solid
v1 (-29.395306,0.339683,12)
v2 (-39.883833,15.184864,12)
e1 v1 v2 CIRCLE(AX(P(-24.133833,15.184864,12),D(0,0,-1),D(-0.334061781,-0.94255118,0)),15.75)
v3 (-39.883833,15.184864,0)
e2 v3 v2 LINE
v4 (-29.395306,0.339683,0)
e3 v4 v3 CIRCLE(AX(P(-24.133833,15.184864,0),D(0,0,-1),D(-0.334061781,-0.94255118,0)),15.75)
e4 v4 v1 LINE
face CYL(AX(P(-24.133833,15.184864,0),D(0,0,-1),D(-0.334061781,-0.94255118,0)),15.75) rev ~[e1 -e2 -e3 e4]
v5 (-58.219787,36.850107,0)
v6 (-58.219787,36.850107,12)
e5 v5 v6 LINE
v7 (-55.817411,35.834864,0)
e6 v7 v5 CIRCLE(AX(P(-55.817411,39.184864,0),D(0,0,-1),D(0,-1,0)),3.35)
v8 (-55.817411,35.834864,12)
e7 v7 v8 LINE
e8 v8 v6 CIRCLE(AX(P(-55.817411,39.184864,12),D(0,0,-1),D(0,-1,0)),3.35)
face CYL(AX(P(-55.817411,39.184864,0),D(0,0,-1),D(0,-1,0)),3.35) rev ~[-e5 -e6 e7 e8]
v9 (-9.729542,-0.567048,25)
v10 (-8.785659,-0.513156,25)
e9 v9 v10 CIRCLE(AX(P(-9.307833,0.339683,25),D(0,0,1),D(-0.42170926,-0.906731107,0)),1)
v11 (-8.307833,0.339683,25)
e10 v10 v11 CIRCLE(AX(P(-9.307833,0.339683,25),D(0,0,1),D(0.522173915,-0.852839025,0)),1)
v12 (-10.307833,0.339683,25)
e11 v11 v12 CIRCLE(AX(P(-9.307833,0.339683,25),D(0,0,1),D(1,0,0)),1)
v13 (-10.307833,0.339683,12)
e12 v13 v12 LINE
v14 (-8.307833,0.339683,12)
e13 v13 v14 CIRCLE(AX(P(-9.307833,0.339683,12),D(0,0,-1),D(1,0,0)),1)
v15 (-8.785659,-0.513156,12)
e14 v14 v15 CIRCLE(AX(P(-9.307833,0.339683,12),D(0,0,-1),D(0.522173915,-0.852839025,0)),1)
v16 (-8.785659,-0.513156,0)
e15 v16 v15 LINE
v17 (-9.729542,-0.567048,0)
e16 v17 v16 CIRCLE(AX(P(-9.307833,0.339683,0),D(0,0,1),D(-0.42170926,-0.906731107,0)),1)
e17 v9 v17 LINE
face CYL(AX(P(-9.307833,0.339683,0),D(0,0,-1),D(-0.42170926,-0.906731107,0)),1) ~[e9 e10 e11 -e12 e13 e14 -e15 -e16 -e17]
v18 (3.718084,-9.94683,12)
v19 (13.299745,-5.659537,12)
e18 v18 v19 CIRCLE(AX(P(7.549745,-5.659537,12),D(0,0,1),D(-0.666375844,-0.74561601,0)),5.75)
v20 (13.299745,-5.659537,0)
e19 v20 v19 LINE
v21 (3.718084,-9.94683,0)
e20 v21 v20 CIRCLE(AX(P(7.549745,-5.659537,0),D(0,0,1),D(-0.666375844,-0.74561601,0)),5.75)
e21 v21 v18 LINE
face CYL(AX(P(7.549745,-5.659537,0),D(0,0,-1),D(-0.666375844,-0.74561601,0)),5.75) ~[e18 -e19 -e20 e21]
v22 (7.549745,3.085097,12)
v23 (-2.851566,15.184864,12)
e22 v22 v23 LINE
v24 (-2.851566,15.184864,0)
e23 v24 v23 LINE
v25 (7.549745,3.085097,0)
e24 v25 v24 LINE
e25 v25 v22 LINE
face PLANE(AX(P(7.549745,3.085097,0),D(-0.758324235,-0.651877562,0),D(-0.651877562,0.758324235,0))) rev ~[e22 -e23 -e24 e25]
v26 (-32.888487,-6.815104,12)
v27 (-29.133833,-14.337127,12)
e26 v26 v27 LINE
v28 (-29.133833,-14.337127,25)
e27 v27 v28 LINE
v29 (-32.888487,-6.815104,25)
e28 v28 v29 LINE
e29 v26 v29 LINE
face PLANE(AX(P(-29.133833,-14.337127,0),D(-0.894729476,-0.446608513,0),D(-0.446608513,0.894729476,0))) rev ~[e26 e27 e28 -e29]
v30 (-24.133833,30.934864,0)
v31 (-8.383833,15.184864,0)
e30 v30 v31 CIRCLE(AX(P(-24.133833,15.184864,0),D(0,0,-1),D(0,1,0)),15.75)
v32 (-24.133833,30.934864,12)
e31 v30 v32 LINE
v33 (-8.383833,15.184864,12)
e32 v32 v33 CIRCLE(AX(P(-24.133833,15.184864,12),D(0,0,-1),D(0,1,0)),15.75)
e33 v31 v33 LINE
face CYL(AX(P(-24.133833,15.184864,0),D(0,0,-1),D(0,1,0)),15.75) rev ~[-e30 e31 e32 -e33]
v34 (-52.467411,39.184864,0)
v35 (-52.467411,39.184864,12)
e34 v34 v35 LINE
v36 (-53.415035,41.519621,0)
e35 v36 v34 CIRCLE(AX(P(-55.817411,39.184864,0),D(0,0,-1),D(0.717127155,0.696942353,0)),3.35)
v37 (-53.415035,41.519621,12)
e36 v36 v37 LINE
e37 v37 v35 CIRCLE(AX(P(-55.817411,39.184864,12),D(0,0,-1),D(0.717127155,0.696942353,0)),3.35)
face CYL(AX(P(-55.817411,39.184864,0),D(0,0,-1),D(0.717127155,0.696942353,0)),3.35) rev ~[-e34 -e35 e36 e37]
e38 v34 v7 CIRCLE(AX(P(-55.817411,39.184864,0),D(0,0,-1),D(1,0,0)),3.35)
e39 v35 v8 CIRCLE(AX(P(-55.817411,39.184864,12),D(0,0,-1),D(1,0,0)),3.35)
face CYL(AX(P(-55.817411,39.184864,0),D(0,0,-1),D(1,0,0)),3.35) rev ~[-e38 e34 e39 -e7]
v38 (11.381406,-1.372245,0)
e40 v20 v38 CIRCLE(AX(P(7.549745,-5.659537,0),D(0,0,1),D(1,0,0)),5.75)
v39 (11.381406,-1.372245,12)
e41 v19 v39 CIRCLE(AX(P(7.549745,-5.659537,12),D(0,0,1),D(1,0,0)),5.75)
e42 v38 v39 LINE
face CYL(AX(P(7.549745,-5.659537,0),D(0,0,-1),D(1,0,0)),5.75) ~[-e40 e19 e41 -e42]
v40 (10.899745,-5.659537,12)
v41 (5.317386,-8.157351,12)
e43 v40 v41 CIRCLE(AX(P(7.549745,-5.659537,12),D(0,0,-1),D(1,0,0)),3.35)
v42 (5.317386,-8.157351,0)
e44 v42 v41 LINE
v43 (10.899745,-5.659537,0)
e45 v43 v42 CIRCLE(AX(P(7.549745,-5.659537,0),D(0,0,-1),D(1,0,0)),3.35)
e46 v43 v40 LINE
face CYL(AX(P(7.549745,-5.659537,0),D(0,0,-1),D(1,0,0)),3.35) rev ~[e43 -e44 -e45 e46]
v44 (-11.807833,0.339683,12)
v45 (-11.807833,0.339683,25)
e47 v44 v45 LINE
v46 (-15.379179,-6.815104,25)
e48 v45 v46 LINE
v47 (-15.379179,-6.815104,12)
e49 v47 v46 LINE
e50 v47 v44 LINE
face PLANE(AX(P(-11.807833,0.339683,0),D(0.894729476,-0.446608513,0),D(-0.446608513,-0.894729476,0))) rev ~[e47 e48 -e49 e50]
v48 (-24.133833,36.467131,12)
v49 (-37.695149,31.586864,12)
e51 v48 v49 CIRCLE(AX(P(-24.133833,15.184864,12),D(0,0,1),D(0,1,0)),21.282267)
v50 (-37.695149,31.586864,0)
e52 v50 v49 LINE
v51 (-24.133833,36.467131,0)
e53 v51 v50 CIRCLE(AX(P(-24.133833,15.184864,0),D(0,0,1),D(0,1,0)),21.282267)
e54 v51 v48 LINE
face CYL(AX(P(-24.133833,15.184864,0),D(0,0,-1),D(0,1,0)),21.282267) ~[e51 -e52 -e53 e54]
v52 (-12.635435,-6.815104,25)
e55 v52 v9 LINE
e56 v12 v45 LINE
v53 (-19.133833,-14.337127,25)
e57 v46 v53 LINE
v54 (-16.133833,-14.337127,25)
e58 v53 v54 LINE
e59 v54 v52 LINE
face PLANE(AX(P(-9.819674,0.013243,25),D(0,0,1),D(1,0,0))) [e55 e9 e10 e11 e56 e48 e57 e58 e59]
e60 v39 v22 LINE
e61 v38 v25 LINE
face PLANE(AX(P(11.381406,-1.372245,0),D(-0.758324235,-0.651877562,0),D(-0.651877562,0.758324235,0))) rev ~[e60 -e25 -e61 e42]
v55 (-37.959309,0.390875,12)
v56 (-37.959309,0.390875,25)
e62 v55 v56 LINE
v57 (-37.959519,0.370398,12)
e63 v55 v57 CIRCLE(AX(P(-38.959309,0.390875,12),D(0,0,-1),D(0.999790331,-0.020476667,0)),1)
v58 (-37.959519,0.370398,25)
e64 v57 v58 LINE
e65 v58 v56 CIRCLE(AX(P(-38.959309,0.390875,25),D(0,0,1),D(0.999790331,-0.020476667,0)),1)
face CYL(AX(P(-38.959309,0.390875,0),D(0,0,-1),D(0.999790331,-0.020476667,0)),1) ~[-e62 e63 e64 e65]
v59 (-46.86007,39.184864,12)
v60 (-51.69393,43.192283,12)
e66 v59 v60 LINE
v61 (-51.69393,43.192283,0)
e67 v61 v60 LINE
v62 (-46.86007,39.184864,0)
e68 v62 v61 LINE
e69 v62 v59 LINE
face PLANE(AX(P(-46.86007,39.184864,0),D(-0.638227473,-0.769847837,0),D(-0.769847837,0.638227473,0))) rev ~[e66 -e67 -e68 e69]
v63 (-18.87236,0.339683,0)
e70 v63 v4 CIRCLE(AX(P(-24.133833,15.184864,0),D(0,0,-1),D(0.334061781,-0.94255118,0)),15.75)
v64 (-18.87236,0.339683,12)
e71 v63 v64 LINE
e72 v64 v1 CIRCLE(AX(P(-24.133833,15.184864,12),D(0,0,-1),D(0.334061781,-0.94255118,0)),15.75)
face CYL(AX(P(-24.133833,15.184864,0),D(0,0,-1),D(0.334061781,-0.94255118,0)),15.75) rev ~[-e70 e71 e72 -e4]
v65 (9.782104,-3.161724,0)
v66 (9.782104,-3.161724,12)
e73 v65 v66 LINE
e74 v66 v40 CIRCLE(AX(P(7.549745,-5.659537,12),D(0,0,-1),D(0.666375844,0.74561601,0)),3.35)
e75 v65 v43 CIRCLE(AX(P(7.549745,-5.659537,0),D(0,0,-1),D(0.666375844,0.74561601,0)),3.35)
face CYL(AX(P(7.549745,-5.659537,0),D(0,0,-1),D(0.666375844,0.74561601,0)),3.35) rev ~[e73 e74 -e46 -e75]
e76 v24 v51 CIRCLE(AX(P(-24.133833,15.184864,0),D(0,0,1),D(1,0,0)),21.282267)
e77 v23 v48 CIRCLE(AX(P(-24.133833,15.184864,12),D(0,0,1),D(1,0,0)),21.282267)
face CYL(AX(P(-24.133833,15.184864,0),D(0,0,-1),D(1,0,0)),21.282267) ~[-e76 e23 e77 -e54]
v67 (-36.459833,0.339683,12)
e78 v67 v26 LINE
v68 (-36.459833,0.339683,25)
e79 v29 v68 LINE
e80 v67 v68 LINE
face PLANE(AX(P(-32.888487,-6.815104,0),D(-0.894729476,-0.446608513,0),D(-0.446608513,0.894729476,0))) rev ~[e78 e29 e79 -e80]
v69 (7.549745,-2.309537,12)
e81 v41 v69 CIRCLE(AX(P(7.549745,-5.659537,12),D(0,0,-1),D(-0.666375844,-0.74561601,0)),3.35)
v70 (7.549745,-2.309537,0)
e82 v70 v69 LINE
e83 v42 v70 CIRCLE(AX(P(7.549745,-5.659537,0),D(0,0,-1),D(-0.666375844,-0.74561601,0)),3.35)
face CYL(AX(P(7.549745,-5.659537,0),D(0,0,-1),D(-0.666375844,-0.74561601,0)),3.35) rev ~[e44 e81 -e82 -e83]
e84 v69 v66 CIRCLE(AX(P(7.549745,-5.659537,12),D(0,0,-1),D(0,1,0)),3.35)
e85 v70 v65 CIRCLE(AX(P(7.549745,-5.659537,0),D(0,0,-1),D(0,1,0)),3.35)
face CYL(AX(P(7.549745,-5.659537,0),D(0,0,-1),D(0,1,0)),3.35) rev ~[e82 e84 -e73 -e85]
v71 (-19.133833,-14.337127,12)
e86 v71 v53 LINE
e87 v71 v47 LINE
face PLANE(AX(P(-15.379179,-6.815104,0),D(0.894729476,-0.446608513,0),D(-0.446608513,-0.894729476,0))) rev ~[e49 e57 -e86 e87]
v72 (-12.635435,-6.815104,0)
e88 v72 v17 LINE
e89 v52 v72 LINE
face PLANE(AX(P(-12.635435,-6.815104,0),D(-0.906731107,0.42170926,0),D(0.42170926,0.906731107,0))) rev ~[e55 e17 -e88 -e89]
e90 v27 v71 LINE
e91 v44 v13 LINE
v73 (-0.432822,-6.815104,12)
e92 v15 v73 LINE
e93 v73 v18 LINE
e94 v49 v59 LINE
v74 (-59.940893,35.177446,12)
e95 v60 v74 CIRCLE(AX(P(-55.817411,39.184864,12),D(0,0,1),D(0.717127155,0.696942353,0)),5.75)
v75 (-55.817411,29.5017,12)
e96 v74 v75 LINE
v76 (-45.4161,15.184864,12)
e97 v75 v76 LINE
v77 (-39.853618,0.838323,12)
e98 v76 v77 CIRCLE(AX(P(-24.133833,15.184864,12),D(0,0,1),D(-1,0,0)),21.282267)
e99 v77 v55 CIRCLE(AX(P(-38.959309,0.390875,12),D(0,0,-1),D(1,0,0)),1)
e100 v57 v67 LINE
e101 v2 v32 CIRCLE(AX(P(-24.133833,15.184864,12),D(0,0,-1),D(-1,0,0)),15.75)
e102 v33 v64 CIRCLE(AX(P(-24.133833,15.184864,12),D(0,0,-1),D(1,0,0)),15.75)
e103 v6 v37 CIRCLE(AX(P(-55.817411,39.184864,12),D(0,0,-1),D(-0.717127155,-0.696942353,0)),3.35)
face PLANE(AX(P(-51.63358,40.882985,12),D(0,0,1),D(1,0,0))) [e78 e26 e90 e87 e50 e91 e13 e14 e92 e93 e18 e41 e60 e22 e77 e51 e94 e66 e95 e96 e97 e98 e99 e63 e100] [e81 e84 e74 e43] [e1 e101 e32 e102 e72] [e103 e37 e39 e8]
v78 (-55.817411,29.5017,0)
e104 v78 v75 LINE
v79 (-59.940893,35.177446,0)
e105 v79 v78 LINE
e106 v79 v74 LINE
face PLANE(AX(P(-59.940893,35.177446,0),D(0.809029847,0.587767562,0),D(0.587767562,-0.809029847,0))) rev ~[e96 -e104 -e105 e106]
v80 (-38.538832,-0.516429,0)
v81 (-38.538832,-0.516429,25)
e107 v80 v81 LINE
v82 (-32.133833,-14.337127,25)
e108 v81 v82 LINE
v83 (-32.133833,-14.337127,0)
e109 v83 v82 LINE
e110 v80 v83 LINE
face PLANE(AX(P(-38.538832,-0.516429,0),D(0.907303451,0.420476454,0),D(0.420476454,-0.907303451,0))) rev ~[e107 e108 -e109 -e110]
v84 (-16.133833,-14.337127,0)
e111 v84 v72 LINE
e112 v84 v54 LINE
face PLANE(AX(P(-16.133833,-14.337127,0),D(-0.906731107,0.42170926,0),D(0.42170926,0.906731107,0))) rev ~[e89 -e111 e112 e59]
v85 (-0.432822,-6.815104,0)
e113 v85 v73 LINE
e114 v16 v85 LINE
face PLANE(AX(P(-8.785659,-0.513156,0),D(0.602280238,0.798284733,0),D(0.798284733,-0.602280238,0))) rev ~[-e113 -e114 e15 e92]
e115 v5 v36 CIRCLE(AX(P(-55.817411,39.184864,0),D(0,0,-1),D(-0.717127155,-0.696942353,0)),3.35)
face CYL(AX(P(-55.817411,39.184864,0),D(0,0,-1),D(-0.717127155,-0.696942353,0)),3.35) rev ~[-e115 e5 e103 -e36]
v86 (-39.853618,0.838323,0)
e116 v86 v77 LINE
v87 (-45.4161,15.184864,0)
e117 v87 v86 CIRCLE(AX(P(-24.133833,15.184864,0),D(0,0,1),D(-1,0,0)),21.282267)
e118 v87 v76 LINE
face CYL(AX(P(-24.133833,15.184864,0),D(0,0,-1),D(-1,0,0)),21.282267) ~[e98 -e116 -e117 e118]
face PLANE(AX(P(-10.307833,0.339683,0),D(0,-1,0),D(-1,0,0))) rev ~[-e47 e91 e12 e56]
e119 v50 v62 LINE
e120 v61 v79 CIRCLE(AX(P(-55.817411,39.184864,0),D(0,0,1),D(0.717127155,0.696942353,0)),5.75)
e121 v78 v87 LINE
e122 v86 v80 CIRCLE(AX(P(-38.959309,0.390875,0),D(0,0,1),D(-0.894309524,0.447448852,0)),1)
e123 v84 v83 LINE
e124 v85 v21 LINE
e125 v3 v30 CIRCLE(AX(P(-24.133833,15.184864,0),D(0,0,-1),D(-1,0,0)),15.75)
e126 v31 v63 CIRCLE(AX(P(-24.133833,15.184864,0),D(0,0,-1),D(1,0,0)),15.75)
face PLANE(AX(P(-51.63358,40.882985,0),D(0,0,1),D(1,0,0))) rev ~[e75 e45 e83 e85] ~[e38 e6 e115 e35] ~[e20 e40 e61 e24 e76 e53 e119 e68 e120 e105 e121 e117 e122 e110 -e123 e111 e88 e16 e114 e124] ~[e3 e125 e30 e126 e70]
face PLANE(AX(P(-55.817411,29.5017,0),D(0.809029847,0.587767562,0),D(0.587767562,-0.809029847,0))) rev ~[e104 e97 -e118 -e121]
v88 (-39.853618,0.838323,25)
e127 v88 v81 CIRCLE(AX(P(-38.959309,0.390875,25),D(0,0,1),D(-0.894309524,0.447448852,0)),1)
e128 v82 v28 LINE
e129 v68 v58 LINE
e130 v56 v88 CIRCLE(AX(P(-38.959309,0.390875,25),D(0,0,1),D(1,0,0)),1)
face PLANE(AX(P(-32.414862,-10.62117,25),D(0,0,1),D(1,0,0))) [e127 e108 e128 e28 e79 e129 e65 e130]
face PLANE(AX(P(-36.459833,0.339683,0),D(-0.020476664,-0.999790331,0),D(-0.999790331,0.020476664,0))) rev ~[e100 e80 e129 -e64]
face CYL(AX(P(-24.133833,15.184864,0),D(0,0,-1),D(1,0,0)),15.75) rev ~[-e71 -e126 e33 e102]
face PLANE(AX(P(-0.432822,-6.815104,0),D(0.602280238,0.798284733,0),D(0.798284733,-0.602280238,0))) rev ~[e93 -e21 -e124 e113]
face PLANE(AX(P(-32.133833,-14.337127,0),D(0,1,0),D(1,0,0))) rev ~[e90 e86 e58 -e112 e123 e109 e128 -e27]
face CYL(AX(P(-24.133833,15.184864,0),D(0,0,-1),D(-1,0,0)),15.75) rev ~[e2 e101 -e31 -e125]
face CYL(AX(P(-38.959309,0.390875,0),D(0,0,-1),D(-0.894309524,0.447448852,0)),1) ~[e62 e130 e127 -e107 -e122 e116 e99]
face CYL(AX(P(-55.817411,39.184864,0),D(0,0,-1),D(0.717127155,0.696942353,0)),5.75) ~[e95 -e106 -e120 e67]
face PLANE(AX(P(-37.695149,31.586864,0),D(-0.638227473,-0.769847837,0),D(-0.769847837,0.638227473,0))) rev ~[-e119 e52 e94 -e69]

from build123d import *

# Parameters (mm, degrees)
F1_DEPTH = 12
F2_DEPTH = 25


with BuildPart() as f1:
    # F0 (on Top) → F1 (new body)
    with BuildSketch(Plane.XY):
        with BuildLine():
            ThreePointArc((-53.4150354704, 41.5196209399), (-52.7133447938, 40.4447331982), (-52.4674114412, 39.1848640586))
            Line((-52.4674114412, 39.1848640586), (-50.0674114412, 39.1848640586))
            ThreePointArc((-50.0674114412, 39.1848640586), (-50.4895358525, 41.3473260146), (-51.6939302973, 43.1922825863))
            Line((-51.6939302973, 43.1922825863), (-53.4150354704, 41.5196209399))
        make_face()
        with BuildLine():
            Line((-50.0674114412, 39.1848640586), (-52.4674114412, 39.1848640586))
            ThreePointArc((-52.4674114412, 39.1848640586), (-53.4486037242, 36.8160563416), (-55.8174114412, 35.8348640586))
            Line((-55.8174114412, 35.8348640586), (-55.8174114412, 33.4348640586))
            ThreePointArc((-55.8174114412, 33.4348640586), (-51.7515474493, 35.1190000668), (-50.0674114412, 39.1848640586))
        make_face()
        with BuildLine():
            ThreePointArc((-51.6939302973, 43.1922825863), (-50.4895358525, 41.3473260146), (-50.0674114412, 39.1848640586))
            Line((-50.0674114412, 39.1848640586), (-46.8600699283, 39.1848640586))
            Line((-46.8600699283, 39.1848640586), (-51.6939302973, 43.1922825863))
        make_face()
        with BuildLine():
            Line((-46.8600699283, 39.1848640586), (-50.0674114412, 39.1848640586))
            ThreePointArc((-50.0674114412, 39.1848640586), (-51.7515474493, 35.1190000668), (-55.8174114412, 33.4348640586))
            Line((-55.8174114412, 33.4348640586), (-55.8174114412, 29.501699648))
            Line((-55.8174114412, 29.501699648), (-45.4160998232, 15.1848640586))
            ThreePointArc((-45.4160998232, 15.1848640586), (-43.3893572478, 24.2490610317), (-37.6951490668, 31.5868635246))
            Line((-37.6951490668, 31.5868635246), (-46.8600699283, 39.1848640586))
        make_face()
        with BuildLine():
            Line((-55.8174114412, 33.4348640586), (-55.8174114412, 35.8348640586))
            ThreePointArc((-55.8174114412, 35.8348640586), (-57.1214560047, 36.099095471), (-58.219787412, 36.8501071773))
            Line((-58.219787412, 36.8501071773), (-59.9408925851, 35.177445531))
            ThreePointArc((-59.9408925851, 35.177445531), (-58.0556968861, 33.8883955874), (-55.8174114412, 33.4348640586))
        make_face()
        with BuildLine():
            ThreePointArc((-58.219787412, 36.8501071773), (-58.1521683225, 41.5872400294), (-53.4150354704, 41.5196209399))
            Line((-53.4150354704, 41.5196209399), (-51.6939302973, 43.1922825863))
            ThreePointArc((-51.6939302973, 43.1922825863), (-59.8248299688, 43.3083452025), (-59.9408925851, 35.177445531))
            Line((-59.9408925851, 35.177445531), (-58.219787412, 36.8501071773))
        make_face()
        with BuildLine():
            Line((-55.8174114412, 29.501699648), (-55.8174114412, 33.4348640586))
            ThreePointArc((-55.8174114412, 33.4348640586), (-58.0556968861, 33.8883955874), (-59.9408925851, 35.177445531))
            Line((-59.9408925851, 35.177445531), (-55.8174114412, 29.501699648))
        make_face()
        with BuildLine():
            ThreePointArc((-24.1338330771, 36.4671308048), (-31.3401896478, 35.2099309207), (-37.6951490668, 31.5868635246))
            ThreePointArc((-37.6951490668, 31.5868635246), (-43.3893572478, 24.2490610317), (-45.4160998232, 15.1848640586))
            Line((-45.4160998232, 15.1848640586), (-42.6338443592, 15.1848640586))
            Line((-42.6338443592, 15.1848640586), (-39.8838330771, 15.1848640586))
            ThreePointArc((-39.8838330771, 15.1848640586), (-35.2707648808, 26.3217958623), (-24.1338330771, 30.9348640586))
            Line((-24.1338330771, 30.9348640586), (-24.1338330771, 36.4671308048))
        make_face()
        with BuildLine():
            ThreePointArc((-2.8515663309, 15.1848640586), (-9.0849979418, 30.2336991939), (-24.1338330771, 36.4671308048))
            Line((-24.1338330771, 36.4671308048), (-24.1338330771, 30.9348640586))
            ThreePointArc((-24.1338330771, 30.9348640586), (-12.9969012734, 26.3217958623), (-8.3838330771, 15.1848640586))
            Line((-8.3838330771, 15.1848640586), (-5.6338443592, 15.1848640586))
            Line((-5.6338443592, 15.1848640586), (-2.8515663309, 15.1848640586))
        make_face()
        with BuildLine():
            Line((-42.6338443592, 15.1848640586), (-45.4160998232, 15.1848640586))
            ThreePointArc((-45.4160998232, 15.1848640586), (-43.9768109648, 7.4912884008), (-39.8536184288, 0.8383234878))
            ThreePointArc((-39.8536184288, 0.8383234878), (-38.7294279835, 1.3640933992), (-37.9593089049, 0.3908746355))
            ThreePointArc((-37.9593089049, 0.3908746355), (-37.9593613235, 0.3806357667), (-37.9595185738, 0.3703979712))
            Line((-37.9595185738, 0.3703979712), (-36.4598330771, 0.3396829748))
            Line((-36.4598330771, 0.3396829748), (-42.6338443592, 15.1848640586))
        make_face()
        with BuildLine():
            Line((7.549745287, 3.085096959), (-2.8515663309, 15.1848640586))
            Line((-2.8515663309, 15.1848640586), (-5.6338443592, 15.1848640586))
            Line((-5.6338443592, 15.1848640586), (-11.8078330771, 0.3396829748))
            Line((-11.8078330771, 0.3396829748), (-10.3078330771, 0.3396829748))
            ThreePointArc((-10.3078330771, 0.3396829748), (-9.3078330771, 1.3396829748), (-8.3078330771, 0.3396829748))
            ThreePointArc((-8.3078330771, 0.3396829748), (-8.4354300981, -0.1491043433), (-8.7856591617, -0.5131560499))
            Line((-8.7856591617, -0.5131560499), (-0.4328217774, -6.8151040581))
            Line((-0.4328217774, -6.8151040581), (1.9170580195, -6.8151040581))
            ThreePointArc((1.9170580195, -6.8151040581), (3.0940181915, -2.0251192122), (7.549745287, 0.0904625331))
            Line((7.549745287, 0.0904625331), (7.549745287, 3.085096959))
        make_face()
        with BuildLine():
            Line((-39.8838330771, 15.1848640586), (-42.6338443592, 15.1848640586))
            Line((-42.6338443592, 15.1848640586), (-36.4598330771, 0.3396829748))
            Line((-36.4598330771, 0.3396829748), (-29.3953061207, 0.3396829748))
            ThreePointArc((-29.3953061207, 0.3396829748), (-36.9971666349, 6.0965666504), (-39.8838330771, 15.1848640586))
        make_face()
        with BuildLine():
            ThreePointArc((-37.9593089049, 0.3908746355), (-38.7294279835, 1.3640933992), (-39.8536184288, 0.8383234878))
            ThreePointArc((-39.8536184288, 0.8383234878), (-39.649771274, 0.6181025887), (-39.4428392954, 0.4007778014))
            Line((-39.4428392954, 0.4007778014), (-38.9593089049, 0.3908746355))
            Line((-38.9593089049, 0.3908746355), (-37.9595185738, 0.3703979712))
            ThreePointArc((-37.9595185738, 0.3703979712), (-37.9593613235, 0.3806357667), (-37.9593089049, 0.3908746355))
        make_face()
        with BuildLine():
            ThreePointArc((-39.4428392954, 0.4007778014), (-39.649771274, 0.6181025887), (-39.8536184288, 0.8383234878))
            ThreePointArc((-39.8536184288, 0.8383234878), (-39.6769215407, -0.3055678279), (-38.5388324508, -0.5164288151))
            Line((-38.5388324508, -0.5164288151), (-38.5671831653, -0.4552536867))
            ThreePointArc((-38.5671831653, -0.4552536867), (-39.0111694362, -0.0335373263), (-39.4428392954, 0.4007778014))
        make_face()
        with BuildLine():
            Line((-5.6338443592, 15.1848640586), (-8.3838330771, 15.1848640586))
            ThreePointArc((-8.3838330771, 15.1848640586), (-11.2704995193, 6.0965666504), (-18.8723600334, 0.3396829748))
            Line((-18.8723600334, 0.3396829748), (-11.8078330771, 0.3396829748))
            Line((-11.8078330771, 0.3396829748), (-5.6338443592, 15.1848640586))
        make_face()
        with BuildLine():
            Line((11.3814063915, -1.3722454101), (7.549745287, 3.085096959))
            Line((7.549745287, 3.085096959), (7.549745287, 0.0904625331))
            ThreePointArc((7.549745287, 0.0904625331), (9.6004245249, -0.2876463043), (11.3814063915, -1.3722454101))
        make_face()
        with BuildLine():
            Line((-29.3953061207, 0.3396829748), (-36.4598330771, 0.3396829748))
            Line((-36.4598330771, 0.3396829748), (-32.8884867815, -6.8151040581))
            Line((-32.8884867815, -6.8151040581), (-24.1338330771, -6.8151040581))
            Line((-24.1338330771, -6.8151040581), (-24.1338330771, -0.5651359414))
            ThreePointArc((-24.1338330771, -0.5651359414), (-26.8031867376, -0.3372830556), (-29.3953061207, 0.3396829748))
        make_face()
        with BuildLine():
            Line((-32.8884867815, -6.8151040581), (-36.4598330771, 0.3396829748))
            Line((-36.4598330771, 0.3396829748), (-37.9595185738, 0.3703979712))
            ThreePointArc((-37.9595185738, 0.3703979712), (-38.1221082882, -0.1560212663), (-38.5388324508, -0.5164288151))
            Line((-38.5388324508, -0.5164288151), (-35.6198039494, -6.8151040581))
            Line((-35.6198039494, -6.8151040581), (-32.8884867815, -6.8151040581))
        make_face()
        with BuildLine():
            Line((-38.9593089049, 0.3908746355), (-39.4428392954, 0.4007778014))
            ThreePointArc((-39.4428392954, 0.4007778014), (-39.0111694362, -0.0335373263), (-38.5671831653, -0.4552536867))
            Line((-38.5671831653, -0.4552536867), (-38.9593089049, 0.3908746355))
        make_face()
        with BuildLine():
            Line((-38.5671831653, -0.4552536867), (-38.5388324508, -0.5164288151))
            ThreePointArc((-38.5388324508, -0.5164288151), (-38.1221082882, -0.1560212663), (-37.9595185738, 0.3703979712))
            Line((-37.9595185738, 0.3703979712), (-38.9593089049, 0.3908746355))
            Line((-38.9593089049, 0.3908746355), (-38.5671831653, -0.4552536867))
        make_face()
        with BuildLine():
            Line((-11.8078330771, 0.3396829748), (-18.8723600334, 0.3396829748))
            ThreePointArc((-18.8723600334, 0.3396829748), (-21.4644794165, -0.3372830556), (-24.1338330771, -0.5651359414))
            Line((-24.1338330771, -0.5651359414), (-24.1338330771, -6.8151040581))
            Line((-24.1338330771, -6.8151040581), (-15.3791793726, -6.8151040581))
            Line((-15.3791793726, -6.8151040581), (-11.8078330771, 0.3396829748))
        make_face()
        with BuildLine():
            Line((-10.3078330771, 0.3396829748), (-11.8078330771, 0.3396829748))
            Line((-11.8078330771, 0.3396829748), (-15.3791793726, -6.8151040581))
            Line((-15.3791793726, -6.8151040581), (-12.6354347442, -6.8151040581))
            Line((-12.6354347442, -6.8151040581), (-9.7295423368, -0.5670481321))
            ThreePointArc((-9.7295423368, -0.5670481321), (-10.1509550314, -0.1980394165), (-10.3078330771, 0.3396829748))
        make_face()
        with BuildLine():
            ThreePointArc((11.3814063915, -1.3722454101), (9.6004245249, -0.2876463043), (7.549745287, 0.0904625331))
            Line((7.549745287, 0.0904625331), (7.549745287, -2.3095374669))
            ThreePointArc((7.549745287, -2.3095374669), (8.744488843, -2.5298269634), (9.7821043653, -3.1617238338))
            Line((9.7821043653, -3.1617238338), (11.3814063915, -1.3722454101))
        make_face()
        with BuildLine():
            Line((7.549745287, -2.3095374669), (7.549745287, 0.0904625331))
            ThreePointArc((7.549745287, 0.0904625331), (3.0940181915, -2.0251192122), (1.9170580195, -6.8151040581))
            ThreePointArc((1.9170580195, -6.8151040581), (2.5652294004, -8.526086154), (3.7180841826, -9.9468295237))
            Line((3.7180841826, -9.9468295237), (5.3173862088, -8.1573511))
            ThreePointArc((5.3173862088, -8.1573511), (4.4200347836, -4.4647939109), (7.549745287, -2.3095374669))
        make_face()
        with BuildLine():
            ThreePointArc((13.299745287, -5.6595374669), (12.7982951511, -3.3110859931), (11.3814063915, -1.3722454101))
            Line((11.3814063915, -1.3722454101), (9.7821043653, -3.1617238338))
            ThreePointArc((9.7821043653, -3.1617238338), (10.6075960774, -4.291309217), (10.899745287, -5.6595374669))
            ThreePointArc((10.899745287, -5.6595374669), (8.917973537, -8.7173882573), (5.3173862088, -8.1573511))
            Line((5.3173862088, -8.1573511), (3.7180841826, -9.9468295237))
            ThreePointArc((3.7180841826, -9.9468295237), (9.8981967608, -10.9080873309), (13.299745287, -5.6595374669))
        make_face()
        Polygon((-24.1338330771, -6.8151040581), (-32.8884867815, -6.8151040581), (-29.1338330771, -14.3371266833), (-24.1338330771, -14.3371266833), (-24.1338330771, -7.8529477167), align=None)
        Polygon((-29.1338330771, -14.3371266833), (-32.8884867815, -6.8151040581), (-35.6198039494, -6.8151040581), (-32.1338330771, -14.3371266833), align=None)
        Polygon((-12.6354347442, -6.8151040581), (-15.3791793726, -6.8151040581), (-19.1338330771, -14.3371266833), (-16.1338330771, -14.3371266833), align=None)
        Polygon((-19.1338330771, -14.3371266833), (-15.3791793726, -6.8151040581), (-24.1338330771, -6.8151040581), (-24.1338330771, -7.8529477167), (-24.1338330771, -14.3371266833), align=None)
        with BuildLine():
            ThreePointArc((-8.3078330771, 0.3396829748), (-9.3078330771, 1.3396829748), (-10.3078330771, 0.3396829748))
            Line((-10.3078330771, 0.3396829748), (-9.3078330771, 0.3396829748))
            Line((-9.3078330771, 0.3396829748), (-9.4658153661, 0))
            Line((-9.4658153661, 0), (-8.7856591617, -0.5131560499))
            ThreePointArc((-8.7856591617, -0.5131560499), (-8.4354300981, -0.1491043433), (-8.3078330771, 0.3396829748))
        make_face()
        with BuildLine():
            Line((-9.3078330771, 0.3396829748), (-10.3078330771, 0.3396829748))
            ThreePointArc((-10.3078330771, 0.3396829748), (-10.1509550314, -0.1980394165), (-9.7295423368, -0.5670481321))
            Line((-9.7295423368, -0.5670481321), (-9.4658153661, 0))
            Line((-9.4658153661, 0), (-9.3078330771, 0.3396829748))
        make_face()
        with BuildLine():
            ThreePointArc((3.7180841826, -9.9468295237), (2.5652294004, -8.526086154), (1.9170580195, -6.8151040581))
            Line((1.9170580195, -6.8151040581), (-0.4328217774, -6.8151040581))
            Line((-0.4328217774, -6.8151040581), (3.7180841826, -9.9468295237))
        make_face()
        with BuildLine():
            Line((-9.4658153661, 0), (-9.7295423368, -0.5670481321))
            ThreePointArc((-9.7295423368, -0.5670481321), (-9.2508297799, -0.6586910153), (-8.7856591617, -0.5131560499))
            Line((-8.7856591617, -0.5131560499), (-9.4658153661, 0))
        make_face()
    extrude(amount=F1_DEPTH)

    # F0 (on Top) → F2 (join)
    with BuildSketch(Plane.XY):
        Polygon((-29.1338330771, -14.3371266833), (-32.8884867815, -6.8151040581), (-35.6198039494, -6.8151040581), (-32.1338330771, -14.3371266833), align=None)
        with BuildLine():
            Line((-32.8884867815, -6.8151040581), (-36.4598330771, 0.3396829748))
            Line((-36.4598330771, 0.3396829748), (-37.9595185738, 0.3703979712))
            ThreePointArc((-37.9595185738, 0.3703979712), (-38.1221082882, -0.1560212663), (-38.5388324508, -0.5164288151))
            Line((-38.5388324508, -0.5164288151), (-35.6198039494, -6.8151040581))
            Line((-35.6198039494, -6.8151040581), (-32.8884867815, -6.8151040581))
        make_face()
        with BuildLine():
            Line((-38.5671831653, -0.4552536867), (-38.5388324508, -0.5164288151))
            ThreePointArc((-38.5388324508, -0.5164288151), (-38.1221082882, -0.1560212663), (-37.9595185738, 0.3703979712))
            Line((-37.9595185738, 0.3703979712), (-38.9593089049, 0.3908746355))
            Line((-38.9593089049, 0.3908746355), (-38.5671831653, -0.4552536867))
        make_face()
        with BuildLine():
            ThreePointArc((-37.9593089049, 0.3908746355), (-38.7294279835, 1.3640933992), (-39.8536184288, 0.8383234878))
            ThreePointArc((-39.8536184288, 0.8383234878), (-39.649771274, 0.6181025887), (-39.4428392954, 0.4007778014))
            Line((-39.4428392954, 0.4007778014), (-38.9593089049, 0.3908746355))
            Line((-38.9593089049, 0.3908746355), (-37.9595185738, 0.3703979712))
            ThreePointArc((-37.9595185738, 0.3703979712), (-37.9593613235, 0.3806357667), (-37.9593089049, 0.3908746355))
        make_face()
        with BuildLine():
            ThreePointArc((-39.4428392954, 0.4007778014), (-39.649771274, 0.6181025887), (-39.8536184288, 0.8383234878))
            ThreePointArc((-39.8536184288, 0.8383234878), (-39.6769215407, -0.3055678279), (-38.5388324508, -0.5164288151))
            Line((-38.5388324508, -0.5164288151), (-38.5671831653, -0.4552536867))
            ThreePointArc((-38.5671831653, -0.4552536867), (-39.0111694362, -0.0335373263), (-39.4428392954, 0.4007778014))
        make_face()
        with BuildLine():
            Line((-38.9593089049, 0.3908746355), (-39.4428392954, 0.4007778014))
            ThreePointArc((-39.4428392954, 0.4007778014), (-39.0111694362, -0.0335373263), (-38.5671831653, -0.4552536867))
            Line((-38.5671831653, -0.4552536867), (-38.9593089049, 0.3908746355))
        make_face()
        with BuildLine():
            Line((-9.3078330771, 0.3396829748), (-10.3078330771, 0.3396829748))
            ThreePointArc((-10.3078330771, 0.3396829748), (-10.1509550314, -0.1980394165), (-9.7295423368, -0.5670481321))
            Line((-9.7295423368, -0.5670481321), (-9.4658153661, 0))
            Line((-9.4658153661, 0), (-9.3078330771, 0.3396829748))
        make_face()
        with BuildLine():
            ThreePointArc((-8.3078330771, 0.3396829748), (-9.3078330771, 1.3396829748), (-10.3078330771, 0.3396829748))
            Line((-10.3078330771, 0.3396829748), (-9.3078330771, 0.3396829748))
            Line((-9.3078330771, 0.3396829748), (-9.4658153661, 0))
            Line((-9.4658153661, 0), (-8.7856591617, -0.5131560499))
            ThreePointArc((-8.7856591617, -0.5131560499), (-8.4354300981, -0.1491043433), (-8.3078330771, 0.3396829748))
        make_face()
        with BuildLine():
            Line((-9.4658153661, 0), (-9.7295423368, -0.5670481321))
            ThreePointArc((-9.7295423368, -0.5670481321), (-9.2508297799, -0.6586910153), (-8.7856591617, -0.5131560499))
            Line((-8.7856591617, -0.5131560499), (-9.4658153661, 0))
        make_face()
        with BuildLine():
            Line((-10.3078330771, 0.3396829748), (-11.8078330771, 0.3396829748))
            Line((-11.8078330771, 0.3396829748), (-15.3791793726, -6.8151040581))
            Line((-15.3791793726, -6.8151040581), (-12.6354347442, -6.8151040581))
            Line((-12.6354347442, -6.8151040581), (-9.7295423368, -0.5670481321))
            ThreePointArc((-9.7295423368, -0.5670481321), (-10.1509550314, -0.1980394165), (-10.3078330771, 0.3396829748))
        make_face()
        Polygon((-12.6354347442, -6.8151040581), (-15.3791793726, -6.8151040581), (-19.1338330771, -14.3371266833), (-16.1338330771, -14.3371266833), align=None)
    extrude(amount=F2_DEPTH)


solid = f1.part
